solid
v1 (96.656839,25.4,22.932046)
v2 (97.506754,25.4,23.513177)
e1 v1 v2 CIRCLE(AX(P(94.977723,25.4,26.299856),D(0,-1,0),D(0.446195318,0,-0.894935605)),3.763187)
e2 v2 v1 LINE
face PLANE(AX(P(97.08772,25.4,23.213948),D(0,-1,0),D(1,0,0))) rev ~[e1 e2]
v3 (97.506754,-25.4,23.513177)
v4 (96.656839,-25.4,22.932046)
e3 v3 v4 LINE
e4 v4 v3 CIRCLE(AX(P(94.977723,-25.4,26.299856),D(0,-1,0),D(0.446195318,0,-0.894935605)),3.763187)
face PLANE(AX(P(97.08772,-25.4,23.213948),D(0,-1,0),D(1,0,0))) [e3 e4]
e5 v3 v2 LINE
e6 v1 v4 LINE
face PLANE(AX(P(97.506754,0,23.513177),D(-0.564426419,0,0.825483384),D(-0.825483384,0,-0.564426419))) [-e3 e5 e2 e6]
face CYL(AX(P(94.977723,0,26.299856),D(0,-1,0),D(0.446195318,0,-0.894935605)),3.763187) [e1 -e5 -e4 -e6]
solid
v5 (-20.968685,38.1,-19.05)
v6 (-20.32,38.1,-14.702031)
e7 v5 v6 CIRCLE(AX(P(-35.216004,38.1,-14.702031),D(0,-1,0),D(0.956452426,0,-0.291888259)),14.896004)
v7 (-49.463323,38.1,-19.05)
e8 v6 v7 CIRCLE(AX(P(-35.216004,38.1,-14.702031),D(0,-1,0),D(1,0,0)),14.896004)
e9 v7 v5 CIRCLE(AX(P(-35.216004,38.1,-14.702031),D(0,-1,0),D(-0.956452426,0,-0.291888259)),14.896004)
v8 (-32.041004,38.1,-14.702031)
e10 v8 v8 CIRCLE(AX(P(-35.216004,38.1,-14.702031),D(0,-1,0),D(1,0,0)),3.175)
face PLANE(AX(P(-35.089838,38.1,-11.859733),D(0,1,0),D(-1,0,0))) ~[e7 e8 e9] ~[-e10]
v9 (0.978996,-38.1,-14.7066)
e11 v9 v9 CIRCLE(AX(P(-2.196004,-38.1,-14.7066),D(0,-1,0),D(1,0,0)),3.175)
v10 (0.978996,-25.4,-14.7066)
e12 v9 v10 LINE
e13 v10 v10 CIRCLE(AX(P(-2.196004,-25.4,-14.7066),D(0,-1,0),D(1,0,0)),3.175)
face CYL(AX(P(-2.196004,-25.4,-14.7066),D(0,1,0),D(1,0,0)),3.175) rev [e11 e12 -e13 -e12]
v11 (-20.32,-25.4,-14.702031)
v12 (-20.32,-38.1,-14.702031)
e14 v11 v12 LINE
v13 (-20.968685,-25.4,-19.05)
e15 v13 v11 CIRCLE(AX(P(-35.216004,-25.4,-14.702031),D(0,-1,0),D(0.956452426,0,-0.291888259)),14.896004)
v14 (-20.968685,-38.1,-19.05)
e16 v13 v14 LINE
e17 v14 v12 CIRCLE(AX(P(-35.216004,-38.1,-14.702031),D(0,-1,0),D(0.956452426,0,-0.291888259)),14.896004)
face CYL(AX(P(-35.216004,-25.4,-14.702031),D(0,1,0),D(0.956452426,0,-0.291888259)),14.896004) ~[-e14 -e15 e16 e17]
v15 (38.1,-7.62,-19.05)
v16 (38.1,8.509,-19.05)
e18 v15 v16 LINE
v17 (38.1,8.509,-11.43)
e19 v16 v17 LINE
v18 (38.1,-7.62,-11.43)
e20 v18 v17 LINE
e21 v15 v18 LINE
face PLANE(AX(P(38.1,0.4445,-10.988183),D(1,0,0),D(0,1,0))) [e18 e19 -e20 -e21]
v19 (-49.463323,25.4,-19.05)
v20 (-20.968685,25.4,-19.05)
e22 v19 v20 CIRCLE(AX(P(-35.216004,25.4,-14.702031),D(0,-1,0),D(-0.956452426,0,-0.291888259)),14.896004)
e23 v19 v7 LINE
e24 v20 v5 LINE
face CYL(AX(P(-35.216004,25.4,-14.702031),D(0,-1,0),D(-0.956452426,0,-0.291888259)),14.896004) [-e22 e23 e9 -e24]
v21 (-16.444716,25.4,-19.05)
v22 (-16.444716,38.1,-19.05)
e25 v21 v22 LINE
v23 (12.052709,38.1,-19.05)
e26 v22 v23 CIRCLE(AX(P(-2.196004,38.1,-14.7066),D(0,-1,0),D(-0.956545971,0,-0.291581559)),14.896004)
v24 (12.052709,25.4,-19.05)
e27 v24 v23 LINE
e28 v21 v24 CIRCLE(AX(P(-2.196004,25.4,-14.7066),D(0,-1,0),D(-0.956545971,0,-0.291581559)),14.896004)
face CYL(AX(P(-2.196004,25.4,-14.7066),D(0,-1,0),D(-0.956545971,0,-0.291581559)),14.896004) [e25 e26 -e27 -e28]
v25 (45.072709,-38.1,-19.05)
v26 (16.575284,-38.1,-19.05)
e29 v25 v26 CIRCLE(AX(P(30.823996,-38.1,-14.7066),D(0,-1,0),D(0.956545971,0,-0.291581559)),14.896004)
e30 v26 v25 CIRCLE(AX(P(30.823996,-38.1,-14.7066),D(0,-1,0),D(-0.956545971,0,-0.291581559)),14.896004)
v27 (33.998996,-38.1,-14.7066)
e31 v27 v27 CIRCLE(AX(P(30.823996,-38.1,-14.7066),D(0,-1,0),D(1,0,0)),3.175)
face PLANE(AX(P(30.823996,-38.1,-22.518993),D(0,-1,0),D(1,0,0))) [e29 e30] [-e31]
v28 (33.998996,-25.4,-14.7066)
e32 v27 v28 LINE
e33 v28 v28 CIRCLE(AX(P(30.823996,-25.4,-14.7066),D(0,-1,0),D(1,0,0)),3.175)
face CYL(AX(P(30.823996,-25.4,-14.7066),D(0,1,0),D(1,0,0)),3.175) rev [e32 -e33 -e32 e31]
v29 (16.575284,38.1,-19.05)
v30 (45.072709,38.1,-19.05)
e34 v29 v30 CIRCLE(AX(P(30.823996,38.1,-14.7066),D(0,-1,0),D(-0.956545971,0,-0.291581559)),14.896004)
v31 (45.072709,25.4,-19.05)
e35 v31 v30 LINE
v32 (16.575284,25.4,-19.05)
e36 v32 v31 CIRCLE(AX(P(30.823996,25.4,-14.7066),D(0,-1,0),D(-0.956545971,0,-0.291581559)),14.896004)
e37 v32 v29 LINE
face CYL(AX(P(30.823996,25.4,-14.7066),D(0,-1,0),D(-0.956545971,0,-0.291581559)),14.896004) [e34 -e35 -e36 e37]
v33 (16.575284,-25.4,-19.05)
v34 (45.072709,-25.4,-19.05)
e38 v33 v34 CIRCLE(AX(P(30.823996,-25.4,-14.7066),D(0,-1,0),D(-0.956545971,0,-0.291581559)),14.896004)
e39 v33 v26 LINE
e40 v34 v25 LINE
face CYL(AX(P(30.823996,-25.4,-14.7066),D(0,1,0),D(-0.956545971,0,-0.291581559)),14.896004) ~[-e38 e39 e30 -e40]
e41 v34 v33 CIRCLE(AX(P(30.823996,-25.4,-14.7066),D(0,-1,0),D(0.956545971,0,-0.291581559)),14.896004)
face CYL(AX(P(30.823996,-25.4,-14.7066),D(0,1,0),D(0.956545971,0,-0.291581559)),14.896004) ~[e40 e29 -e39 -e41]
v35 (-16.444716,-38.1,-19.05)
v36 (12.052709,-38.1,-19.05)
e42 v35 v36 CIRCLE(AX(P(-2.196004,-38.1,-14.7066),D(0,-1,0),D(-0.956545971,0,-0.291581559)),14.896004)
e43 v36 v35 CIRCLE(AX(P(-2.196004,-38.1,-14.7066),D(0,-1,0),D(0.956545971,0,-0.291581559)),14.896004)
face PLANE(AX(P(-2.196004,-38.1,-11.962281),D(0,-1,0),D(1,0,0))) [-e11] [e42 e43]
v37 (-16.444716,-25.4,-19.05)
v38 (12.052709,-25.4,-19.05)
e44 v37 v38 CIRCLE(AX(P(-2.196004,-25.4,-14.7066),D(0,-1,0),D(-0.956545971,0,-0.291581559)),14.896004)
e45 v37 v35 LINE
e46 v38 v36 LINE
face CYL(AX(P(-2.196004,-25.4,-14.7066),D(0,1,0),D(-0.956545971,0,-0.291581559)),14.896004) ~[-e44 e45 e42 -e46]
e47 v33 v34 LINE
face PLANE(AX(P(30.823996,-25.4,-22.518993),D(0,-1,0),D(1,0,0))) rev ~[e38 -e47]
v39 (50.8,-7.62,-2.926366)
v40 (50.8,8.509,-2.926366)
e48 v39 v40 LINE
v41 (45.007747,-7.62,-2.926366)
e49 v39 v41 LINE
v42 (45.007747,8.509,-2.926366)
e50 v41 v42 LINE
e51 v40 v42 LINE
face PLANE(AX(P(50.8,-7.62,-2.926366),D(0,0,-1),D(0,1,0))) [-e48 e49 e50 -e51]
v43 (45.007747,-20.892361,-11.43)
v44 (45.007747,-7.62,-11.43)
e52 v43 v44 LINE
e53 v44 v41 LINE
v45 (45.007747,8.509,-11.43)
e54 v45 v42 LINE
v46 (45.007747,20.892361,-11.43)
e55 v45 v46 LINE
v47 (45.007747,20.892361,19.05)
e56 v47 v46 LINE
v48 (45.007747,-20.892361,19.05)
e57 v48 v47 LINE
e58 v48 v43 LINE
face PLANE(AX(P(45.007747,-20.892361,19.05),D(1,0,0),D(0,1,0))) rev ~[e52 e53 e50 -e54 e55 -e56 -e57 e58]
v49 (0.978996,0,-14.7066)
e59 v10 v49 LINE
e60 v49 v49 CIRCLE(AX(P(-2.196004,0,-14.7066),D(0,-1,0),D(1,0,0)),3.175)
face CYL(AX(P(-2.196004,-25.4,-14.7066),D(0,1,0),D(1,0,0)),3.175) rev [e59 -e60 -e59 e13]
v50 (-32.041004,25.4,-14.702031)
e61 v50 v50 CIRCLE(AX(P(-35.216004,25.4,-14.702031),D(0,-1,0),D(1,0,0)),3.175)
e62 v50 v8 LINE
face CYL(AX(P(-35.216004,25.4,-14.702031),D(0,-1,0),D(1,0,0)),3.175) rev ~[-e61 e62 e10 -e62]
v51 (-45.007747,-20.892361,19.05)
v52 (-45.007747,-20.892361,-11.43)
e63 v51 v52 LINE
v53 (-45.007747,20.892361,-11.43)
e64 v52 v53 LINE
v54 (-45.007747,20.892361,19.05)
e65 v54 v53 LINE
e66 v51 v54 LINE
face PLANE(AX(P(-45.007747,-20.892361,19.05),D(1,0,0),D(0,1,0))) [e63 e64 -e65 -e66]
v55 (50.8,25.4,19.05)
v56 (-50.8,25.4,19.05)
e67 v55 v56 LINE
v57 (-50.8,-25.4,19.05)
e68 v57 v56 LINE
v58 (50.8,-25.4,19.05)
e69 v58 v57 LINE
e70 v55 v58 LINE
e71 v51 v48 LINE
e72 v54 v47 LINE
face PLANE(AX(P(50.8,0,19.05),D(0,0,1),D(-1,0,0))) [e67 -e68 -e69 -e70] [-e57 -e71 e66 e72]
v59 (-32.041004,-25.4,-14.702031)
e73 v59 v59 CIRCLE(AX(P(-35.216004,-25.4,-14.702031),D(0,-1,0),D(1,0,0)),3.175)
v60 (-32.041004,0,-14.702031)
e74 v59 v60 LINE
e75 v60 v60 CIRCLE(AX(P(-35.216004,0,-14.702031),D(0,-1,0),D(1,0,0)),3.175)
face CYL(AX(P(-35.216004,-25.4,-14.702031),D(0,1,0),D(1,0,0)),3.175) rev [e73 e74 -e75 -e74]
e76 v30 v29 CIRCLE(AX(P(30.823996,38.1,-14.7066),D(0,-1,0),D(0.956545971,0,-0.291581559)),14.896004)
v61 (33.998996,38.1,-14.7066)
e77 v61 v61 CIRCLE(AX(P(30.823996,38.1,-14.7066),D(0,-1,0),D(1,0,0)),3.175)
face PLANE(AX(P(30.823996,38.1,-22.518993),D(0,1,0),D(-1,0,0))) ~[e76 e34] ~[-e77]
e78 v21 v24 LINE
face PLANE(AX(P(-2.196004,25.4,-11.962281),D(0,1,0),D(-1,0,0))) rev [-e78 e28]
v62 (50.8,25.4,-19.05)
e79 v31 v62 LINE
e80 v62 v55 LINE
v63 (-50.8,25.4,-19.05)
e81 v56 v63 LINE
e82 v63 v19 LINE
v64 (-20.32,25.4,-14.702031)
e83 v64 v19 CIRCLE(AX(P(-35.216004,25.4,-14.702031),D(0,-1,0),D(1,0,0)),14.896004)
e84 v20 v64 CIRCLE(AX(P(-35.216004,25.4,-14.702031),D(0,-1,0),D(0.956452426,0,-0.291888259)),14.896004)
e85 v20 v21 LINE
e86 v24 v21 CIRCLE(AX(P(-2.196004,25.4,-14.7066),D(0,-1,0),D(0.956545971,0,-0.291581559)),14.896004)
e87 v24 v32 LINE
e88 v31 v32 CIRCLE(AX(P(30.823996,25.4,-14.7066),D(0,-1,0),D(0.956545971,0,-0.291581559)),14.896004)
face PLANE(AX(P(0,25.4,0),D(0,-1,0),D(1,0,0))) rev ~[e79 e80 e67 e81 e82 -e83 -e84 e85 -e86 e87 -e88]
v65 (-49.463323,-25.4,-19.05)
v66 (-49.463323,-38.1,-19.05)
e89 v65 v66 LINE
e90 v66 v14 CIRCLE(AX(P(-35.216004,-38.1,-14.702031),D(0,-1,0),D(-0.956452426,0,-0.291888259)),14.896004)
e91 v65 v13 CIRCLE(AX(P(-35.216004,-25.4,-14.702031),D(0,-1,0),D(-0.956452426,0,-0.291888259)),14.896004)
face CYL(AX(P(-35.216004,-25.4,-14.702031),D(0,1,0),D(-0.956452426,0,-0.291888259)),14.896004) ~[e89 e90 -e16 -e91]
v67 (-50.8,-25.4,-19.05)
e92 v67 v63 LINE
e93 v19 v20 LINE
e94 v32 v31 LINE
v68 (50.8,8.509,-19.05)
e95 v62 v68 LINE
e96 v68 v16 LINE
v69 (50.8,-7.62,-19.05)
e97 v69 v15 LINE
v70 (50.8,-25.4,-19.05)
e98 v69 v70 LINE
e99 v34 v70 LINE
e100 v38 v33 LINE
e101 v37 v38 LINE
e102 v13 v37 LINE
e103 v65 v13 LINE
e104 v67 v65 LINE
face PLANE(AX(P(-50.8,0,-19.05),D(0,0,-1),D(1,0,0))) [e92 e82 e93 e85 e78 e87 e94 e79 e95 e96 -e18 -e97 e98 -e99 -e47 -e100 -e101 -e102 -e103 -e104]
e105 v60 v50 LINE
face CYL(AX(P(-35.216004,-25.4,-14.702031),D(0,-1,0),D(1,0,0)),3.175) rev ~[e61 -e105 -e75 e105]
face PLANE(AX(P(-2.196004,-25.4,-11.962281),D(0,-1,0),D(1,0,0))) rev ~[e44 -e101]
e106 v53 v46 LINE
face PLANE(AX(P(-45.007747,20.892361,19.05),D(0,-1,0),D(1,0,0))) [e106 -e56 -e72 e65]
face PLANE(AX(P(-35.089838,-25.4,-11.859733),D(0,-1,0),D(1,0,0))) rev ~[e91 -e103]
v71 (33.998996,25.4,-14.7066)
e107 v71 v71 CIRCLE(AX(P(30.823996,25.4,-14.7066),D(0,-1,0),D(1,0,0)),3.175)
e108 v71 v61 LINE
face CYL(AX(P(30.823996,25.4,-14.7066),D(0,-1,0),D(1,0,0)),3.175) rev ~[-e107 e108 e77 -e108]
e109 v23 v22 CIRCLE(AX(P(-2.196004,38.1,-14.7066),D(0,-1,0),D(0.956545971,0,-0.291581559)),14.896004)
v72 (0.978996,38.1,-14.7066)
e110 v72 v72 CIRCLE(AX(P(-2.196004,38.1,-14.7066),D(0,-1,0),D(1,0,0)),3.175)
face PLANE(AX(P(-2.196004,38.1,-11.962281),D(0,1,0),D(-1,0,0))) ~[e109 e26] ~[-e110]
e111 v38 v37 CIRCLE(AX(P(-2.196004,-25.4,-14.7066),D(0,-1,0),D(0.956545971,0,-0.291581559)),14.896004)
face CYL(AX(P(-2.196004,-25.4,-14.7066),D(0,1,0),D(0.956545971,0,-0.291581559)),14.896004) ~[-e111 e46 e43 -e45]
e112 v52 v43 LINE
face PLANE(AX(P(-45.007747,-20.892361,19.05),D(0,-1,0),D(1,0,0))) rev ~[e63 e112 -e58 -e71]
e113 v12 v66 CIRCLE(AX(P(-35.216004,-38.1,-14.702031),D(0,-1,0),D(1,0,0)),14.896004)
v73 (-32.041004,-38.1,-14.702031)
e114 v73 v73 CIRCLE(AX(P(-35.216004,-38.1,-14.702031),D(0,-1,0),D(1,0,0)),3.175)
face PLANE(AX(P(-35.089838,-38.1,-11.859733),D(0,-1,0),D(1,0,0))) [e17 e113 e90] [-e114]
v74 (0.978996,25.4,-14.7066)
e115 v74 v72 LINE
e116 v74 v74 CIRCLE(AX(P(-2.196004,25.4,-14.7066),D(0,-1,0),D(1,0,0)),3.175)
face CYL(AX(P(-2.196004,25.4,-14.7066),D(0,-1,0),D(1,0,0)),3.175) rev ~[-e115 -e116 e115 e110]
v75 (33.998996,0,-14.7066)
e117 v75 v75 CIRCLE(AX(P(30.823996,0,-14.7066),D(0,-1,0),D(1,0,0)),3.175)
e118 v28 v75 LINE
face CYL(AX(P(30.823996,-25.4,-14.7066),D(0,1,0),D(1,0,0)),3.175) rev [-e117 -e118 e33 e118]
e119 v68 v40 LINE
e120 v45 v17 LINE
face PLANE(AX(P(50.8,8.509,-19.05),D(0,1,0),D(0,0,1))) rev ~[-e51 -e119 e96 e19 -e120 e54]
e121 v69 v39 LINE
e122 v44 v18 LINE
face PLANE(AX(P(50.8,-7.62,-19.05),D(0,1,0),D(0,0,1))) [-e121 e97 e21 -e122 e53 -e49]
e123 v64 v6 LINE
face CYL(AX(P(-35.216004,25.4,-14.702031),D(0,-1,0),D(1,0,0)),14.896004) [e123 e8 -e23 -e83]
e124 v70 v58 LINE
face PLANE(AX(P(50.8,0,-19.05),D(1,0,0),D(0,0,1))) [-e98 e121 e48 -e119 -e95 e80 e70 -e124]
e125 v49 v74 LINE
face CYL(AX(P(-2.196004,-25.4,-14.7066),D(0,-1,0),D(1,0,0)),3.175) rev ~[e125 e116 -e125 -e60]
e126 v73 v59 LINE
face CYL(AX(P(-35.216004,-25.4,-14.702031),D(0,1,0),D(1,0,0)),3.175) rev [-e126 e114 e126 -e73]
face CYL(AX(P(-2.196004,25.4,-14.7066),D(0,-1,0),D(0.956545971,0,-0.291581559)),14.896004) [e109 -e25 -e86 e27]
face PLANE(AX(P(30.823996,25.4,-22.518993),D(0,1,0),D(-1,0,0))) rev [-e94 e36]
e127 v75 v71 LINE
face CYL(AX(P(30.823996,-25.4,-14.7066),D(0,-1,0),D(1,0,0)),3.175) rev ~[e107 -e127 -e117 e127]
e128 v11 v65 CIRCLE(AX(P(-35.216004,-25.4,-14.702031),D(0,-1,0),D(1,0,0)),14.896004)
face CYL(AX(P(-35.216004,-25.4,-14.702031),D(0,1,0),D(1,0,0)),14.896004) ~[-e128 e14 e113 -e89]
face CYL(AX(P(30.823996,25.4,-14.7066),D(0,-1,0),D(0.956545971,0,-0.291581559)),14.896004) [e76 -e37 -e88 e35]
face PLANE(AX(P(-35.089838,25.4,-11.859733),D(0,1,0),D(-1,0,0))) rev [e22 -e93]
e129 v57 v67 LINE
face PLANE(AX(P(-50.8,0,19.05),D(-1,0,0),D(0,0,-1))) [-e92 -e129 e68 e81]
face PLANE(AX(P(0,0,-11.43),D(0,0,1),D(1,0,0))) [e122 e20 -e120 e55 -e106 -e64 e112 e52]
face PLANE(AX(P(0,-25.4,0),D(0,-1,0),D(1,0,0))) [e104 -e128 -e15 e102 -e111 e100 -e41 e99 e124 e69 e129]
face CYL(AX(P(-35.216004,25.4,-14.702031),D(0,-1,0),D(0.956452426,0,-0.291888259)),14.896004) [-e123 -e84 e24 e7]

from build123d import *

# Parameters (mm, degrees)
F1_DEPTH  = 25.4
F2_R      = 3.175
F3_DEPTH  = 12.7
F5_W      = 90.0154933333
F5_H      = 41.784722358
F6_DEPTH  = 30.48
F7_W      = 16.129
F7_H      = 16.1236341841
F8_DEPTH  = 12.7
F9_DEPTH  = 25.4
F10_DEPTH = 101.6
F11_DEPTH = 12.7


# Not quite as in the source:
# - a feature names something its author has since deleted; it is built from what else it names


with BuildPart() as f1:
    # F0 (on Front) → F1 (new body, symmetric)
    with BuildSketch(Plane.XZ):
        with BuildLine():
            Line((97.5067541003, 23.5131774098), (96.6568392289, 22.9320458975))
            ThreePointArc((96.6568392289, 22.9320458975), (97.1017650033, 23.1934076134), (97.5067541003, 23.5131774098))
        make_face()
    extrude(amount=F1_DEPTH, both=True)


with BuildPart() as f1b:
    # F0 (on Front) → F1, piece 2 (new body, symmetric)
    with BuildSketch(Plane.XZ):
        Polygon((-50.8, -19.05), (50.8, -19.05), (50.8, -8.4226876497), (50.8, 0), (50.8, 19.05), (-50.8, 19.05), align=None)
    extrude(amount=F1_DEPTH, both=True)



with BuildPart() as f3:
    # F2 (on face) → F3 (new body)
    with BuildSketch(Plane.XZ.offset(25.4)):
        with BuildLine():
            Line((45.0727086193, -19.05), (16.5752838461, -19.05))
            ThreePointArc((16.5752838461, -19.05), (30.8239962327, -29.6026037673), (45.0727086193, -19.05))
        make_face()
        with BuildLine():
            ThreePointArc((45.72, -14.7066), (28.628312416, 0.0266922598), (16.5752838461, -19.05))
            Line((16.5752838461, -19.05), (45.0727086193, -19.05))
            ThreePointArc((45.0727086193, -19.05), (45.5572884925, -16.9022838167), (45.72, -14.7066))
        make_face()
        with Locations((30.8239962327, -14.7066)):
            Circle(F2_R, mode=Mode.SUBTRACT)
    extrude(amount=F3_DEPTH)


with BuildPart() as f3b:
    # F2 (on face) → F3, piece 2 (new body)
    with BuildSketch(Plane.XZ.offset(25.4)):
        with BuildLine():
            ThreePointArc((12.7, -14.7066), (-4.391687584, 0.0266922598), (-16.4447161539, -19.05))
            Line((-16.4447161539, -19.05), (12.0527086193, -19.05))
            ThreePointArc((12.0527086193, -19.05), (12.5372884925, -16.9022838167), (12.7, -14.7066))
        make_face()
        with Locations((-2.1960037673, -14.7066)):
            Circle(F2_R, mode=Mode.SUBTRACT)
        with BuildLine():
            Line((12.0527086193, -19.05), (-16.4447161539, -19.05))
            ThreePointArc((-16.4447161539, -19.05), (-2.1960037673, -29.6026037673), (12.0527086193, -19.05))
        make_face()
    extrude(amount=F3_DEPTH)


with BuildPart() as f3c:
    # F2 (on face) → F3, piece 3 (new body)
    with BuildSketch(Plane.XZ.offset(25.4)):
        with BuildLine():
            ThreePointArc((-20.9686848198, -19.05), (-20.4830637187, -16.9000772846), (-20.32, -14.7020313889))
            ThreePointArc((-20.32, -14.7020313889), (-37.414049663, 0.0309086597), (-49.4633227148, -19.05))
            Line((-49.4633227148, -19.05), (-20.9686848198, -19.05))
        make_face()
        with Locations((-35.2160037673, -14.7020313889)):
            Circle(F2_R, mode=Mode.SUBTRACT)
        with BuildLine():
            Line((-20.9686848198, -19.05), (-49.4633227148, -19.05))
            ThreePointArc((-49.4633227148, -19.05), (-35.2160037673, -29.5980351562), (-20.9686848198, -19.05))
        make_face()
    extrude(amount=F3_DEPTH)


with BuildPart() as f1b_1:
    add(f1b.part)

    add(f3.part)  # F4 merges F3

    add(f3b.part)  # F4 merges F3b

    add(f3c.part)  # F4 merges F3c
    # F4: F3, F3b, F3c across plane
    add(f3.part.mirror(Plane.XZ))
    add(f3b.part.mirror(Plane.XZ))
    add(f3c.part.mirror(Plane.XZ))

    # F5 (on face) → F6 (cut)
    with BuildSketch(Plane.XY.offset(19.05)):
        Rectangle(F5_W, F5_H)
    extrude(amount=-F6_DEPTH, mode=Mode.SUBTRACT)

    # F2 (on face) → F9 (cut)
    with BuildSketch(Plane.XZ.offset(25.4)):
        with Locations((-35.2160037673, -14.7020313889)):
            Circle(F2_R)
        with Locations((-2.1960037673, -14.7066)):
            Circle(F2_R)
        with Locations((30.8239962327, -14.7066)):
            Circle(F2_R)
    extrude(amount=-F9_DEPTH, mode=Mode.SUBTRACT)

    # F2 (on face) → F10 (cut)
    with BuildSketch(Plane.XZ.offset(25.4)):
        with Locations((-2.1960037673, -14.7066)):
            Circle(F2_R)
        with Locations((-35.2160037673, -14.7020313889)):
            Circle(F2_R)
        with Locations((30.8239962327, -14.7066)):
            Circle(F2_R)
    extrude(amount=-F10_DEPTH, mode=Mode.SUBTRACT)


with BuildPart() as f8:
    # F7 (on face) → F8 (new body)
    with BuildSketch(Plane.YZ.offset(50.8)):
        with Locations((0.4445, -10.988182908)):
            Rectangle(F7_W, F7_H)
    extrude(amount=-F8_DEPTH)


with BuildPart() as f11_tool:
    # F7 (on face) → F11 (new body)
    with BuildSketch(Plane.YZ.offset(50.8)):
        with Locations((0.4445, -10.988182908)):
            Rectangle(F7_W, F7_H)
    extrude(amount=-F11_DEPTH)


with BuildPart() as f1b_2:
    add(f1b_1.part)

    # F11: cut by f11_tool
    add(f11_tool.part, mode=Mode.SUBTRACT)


with BuildPart() as f8_1:
    add(f8.part)

    # F11: cut by f11_tool
    add(f11_tool.part, mode=Mode.SUBTRACT)


solid = Compound([f1.part, f1b_2.part])
